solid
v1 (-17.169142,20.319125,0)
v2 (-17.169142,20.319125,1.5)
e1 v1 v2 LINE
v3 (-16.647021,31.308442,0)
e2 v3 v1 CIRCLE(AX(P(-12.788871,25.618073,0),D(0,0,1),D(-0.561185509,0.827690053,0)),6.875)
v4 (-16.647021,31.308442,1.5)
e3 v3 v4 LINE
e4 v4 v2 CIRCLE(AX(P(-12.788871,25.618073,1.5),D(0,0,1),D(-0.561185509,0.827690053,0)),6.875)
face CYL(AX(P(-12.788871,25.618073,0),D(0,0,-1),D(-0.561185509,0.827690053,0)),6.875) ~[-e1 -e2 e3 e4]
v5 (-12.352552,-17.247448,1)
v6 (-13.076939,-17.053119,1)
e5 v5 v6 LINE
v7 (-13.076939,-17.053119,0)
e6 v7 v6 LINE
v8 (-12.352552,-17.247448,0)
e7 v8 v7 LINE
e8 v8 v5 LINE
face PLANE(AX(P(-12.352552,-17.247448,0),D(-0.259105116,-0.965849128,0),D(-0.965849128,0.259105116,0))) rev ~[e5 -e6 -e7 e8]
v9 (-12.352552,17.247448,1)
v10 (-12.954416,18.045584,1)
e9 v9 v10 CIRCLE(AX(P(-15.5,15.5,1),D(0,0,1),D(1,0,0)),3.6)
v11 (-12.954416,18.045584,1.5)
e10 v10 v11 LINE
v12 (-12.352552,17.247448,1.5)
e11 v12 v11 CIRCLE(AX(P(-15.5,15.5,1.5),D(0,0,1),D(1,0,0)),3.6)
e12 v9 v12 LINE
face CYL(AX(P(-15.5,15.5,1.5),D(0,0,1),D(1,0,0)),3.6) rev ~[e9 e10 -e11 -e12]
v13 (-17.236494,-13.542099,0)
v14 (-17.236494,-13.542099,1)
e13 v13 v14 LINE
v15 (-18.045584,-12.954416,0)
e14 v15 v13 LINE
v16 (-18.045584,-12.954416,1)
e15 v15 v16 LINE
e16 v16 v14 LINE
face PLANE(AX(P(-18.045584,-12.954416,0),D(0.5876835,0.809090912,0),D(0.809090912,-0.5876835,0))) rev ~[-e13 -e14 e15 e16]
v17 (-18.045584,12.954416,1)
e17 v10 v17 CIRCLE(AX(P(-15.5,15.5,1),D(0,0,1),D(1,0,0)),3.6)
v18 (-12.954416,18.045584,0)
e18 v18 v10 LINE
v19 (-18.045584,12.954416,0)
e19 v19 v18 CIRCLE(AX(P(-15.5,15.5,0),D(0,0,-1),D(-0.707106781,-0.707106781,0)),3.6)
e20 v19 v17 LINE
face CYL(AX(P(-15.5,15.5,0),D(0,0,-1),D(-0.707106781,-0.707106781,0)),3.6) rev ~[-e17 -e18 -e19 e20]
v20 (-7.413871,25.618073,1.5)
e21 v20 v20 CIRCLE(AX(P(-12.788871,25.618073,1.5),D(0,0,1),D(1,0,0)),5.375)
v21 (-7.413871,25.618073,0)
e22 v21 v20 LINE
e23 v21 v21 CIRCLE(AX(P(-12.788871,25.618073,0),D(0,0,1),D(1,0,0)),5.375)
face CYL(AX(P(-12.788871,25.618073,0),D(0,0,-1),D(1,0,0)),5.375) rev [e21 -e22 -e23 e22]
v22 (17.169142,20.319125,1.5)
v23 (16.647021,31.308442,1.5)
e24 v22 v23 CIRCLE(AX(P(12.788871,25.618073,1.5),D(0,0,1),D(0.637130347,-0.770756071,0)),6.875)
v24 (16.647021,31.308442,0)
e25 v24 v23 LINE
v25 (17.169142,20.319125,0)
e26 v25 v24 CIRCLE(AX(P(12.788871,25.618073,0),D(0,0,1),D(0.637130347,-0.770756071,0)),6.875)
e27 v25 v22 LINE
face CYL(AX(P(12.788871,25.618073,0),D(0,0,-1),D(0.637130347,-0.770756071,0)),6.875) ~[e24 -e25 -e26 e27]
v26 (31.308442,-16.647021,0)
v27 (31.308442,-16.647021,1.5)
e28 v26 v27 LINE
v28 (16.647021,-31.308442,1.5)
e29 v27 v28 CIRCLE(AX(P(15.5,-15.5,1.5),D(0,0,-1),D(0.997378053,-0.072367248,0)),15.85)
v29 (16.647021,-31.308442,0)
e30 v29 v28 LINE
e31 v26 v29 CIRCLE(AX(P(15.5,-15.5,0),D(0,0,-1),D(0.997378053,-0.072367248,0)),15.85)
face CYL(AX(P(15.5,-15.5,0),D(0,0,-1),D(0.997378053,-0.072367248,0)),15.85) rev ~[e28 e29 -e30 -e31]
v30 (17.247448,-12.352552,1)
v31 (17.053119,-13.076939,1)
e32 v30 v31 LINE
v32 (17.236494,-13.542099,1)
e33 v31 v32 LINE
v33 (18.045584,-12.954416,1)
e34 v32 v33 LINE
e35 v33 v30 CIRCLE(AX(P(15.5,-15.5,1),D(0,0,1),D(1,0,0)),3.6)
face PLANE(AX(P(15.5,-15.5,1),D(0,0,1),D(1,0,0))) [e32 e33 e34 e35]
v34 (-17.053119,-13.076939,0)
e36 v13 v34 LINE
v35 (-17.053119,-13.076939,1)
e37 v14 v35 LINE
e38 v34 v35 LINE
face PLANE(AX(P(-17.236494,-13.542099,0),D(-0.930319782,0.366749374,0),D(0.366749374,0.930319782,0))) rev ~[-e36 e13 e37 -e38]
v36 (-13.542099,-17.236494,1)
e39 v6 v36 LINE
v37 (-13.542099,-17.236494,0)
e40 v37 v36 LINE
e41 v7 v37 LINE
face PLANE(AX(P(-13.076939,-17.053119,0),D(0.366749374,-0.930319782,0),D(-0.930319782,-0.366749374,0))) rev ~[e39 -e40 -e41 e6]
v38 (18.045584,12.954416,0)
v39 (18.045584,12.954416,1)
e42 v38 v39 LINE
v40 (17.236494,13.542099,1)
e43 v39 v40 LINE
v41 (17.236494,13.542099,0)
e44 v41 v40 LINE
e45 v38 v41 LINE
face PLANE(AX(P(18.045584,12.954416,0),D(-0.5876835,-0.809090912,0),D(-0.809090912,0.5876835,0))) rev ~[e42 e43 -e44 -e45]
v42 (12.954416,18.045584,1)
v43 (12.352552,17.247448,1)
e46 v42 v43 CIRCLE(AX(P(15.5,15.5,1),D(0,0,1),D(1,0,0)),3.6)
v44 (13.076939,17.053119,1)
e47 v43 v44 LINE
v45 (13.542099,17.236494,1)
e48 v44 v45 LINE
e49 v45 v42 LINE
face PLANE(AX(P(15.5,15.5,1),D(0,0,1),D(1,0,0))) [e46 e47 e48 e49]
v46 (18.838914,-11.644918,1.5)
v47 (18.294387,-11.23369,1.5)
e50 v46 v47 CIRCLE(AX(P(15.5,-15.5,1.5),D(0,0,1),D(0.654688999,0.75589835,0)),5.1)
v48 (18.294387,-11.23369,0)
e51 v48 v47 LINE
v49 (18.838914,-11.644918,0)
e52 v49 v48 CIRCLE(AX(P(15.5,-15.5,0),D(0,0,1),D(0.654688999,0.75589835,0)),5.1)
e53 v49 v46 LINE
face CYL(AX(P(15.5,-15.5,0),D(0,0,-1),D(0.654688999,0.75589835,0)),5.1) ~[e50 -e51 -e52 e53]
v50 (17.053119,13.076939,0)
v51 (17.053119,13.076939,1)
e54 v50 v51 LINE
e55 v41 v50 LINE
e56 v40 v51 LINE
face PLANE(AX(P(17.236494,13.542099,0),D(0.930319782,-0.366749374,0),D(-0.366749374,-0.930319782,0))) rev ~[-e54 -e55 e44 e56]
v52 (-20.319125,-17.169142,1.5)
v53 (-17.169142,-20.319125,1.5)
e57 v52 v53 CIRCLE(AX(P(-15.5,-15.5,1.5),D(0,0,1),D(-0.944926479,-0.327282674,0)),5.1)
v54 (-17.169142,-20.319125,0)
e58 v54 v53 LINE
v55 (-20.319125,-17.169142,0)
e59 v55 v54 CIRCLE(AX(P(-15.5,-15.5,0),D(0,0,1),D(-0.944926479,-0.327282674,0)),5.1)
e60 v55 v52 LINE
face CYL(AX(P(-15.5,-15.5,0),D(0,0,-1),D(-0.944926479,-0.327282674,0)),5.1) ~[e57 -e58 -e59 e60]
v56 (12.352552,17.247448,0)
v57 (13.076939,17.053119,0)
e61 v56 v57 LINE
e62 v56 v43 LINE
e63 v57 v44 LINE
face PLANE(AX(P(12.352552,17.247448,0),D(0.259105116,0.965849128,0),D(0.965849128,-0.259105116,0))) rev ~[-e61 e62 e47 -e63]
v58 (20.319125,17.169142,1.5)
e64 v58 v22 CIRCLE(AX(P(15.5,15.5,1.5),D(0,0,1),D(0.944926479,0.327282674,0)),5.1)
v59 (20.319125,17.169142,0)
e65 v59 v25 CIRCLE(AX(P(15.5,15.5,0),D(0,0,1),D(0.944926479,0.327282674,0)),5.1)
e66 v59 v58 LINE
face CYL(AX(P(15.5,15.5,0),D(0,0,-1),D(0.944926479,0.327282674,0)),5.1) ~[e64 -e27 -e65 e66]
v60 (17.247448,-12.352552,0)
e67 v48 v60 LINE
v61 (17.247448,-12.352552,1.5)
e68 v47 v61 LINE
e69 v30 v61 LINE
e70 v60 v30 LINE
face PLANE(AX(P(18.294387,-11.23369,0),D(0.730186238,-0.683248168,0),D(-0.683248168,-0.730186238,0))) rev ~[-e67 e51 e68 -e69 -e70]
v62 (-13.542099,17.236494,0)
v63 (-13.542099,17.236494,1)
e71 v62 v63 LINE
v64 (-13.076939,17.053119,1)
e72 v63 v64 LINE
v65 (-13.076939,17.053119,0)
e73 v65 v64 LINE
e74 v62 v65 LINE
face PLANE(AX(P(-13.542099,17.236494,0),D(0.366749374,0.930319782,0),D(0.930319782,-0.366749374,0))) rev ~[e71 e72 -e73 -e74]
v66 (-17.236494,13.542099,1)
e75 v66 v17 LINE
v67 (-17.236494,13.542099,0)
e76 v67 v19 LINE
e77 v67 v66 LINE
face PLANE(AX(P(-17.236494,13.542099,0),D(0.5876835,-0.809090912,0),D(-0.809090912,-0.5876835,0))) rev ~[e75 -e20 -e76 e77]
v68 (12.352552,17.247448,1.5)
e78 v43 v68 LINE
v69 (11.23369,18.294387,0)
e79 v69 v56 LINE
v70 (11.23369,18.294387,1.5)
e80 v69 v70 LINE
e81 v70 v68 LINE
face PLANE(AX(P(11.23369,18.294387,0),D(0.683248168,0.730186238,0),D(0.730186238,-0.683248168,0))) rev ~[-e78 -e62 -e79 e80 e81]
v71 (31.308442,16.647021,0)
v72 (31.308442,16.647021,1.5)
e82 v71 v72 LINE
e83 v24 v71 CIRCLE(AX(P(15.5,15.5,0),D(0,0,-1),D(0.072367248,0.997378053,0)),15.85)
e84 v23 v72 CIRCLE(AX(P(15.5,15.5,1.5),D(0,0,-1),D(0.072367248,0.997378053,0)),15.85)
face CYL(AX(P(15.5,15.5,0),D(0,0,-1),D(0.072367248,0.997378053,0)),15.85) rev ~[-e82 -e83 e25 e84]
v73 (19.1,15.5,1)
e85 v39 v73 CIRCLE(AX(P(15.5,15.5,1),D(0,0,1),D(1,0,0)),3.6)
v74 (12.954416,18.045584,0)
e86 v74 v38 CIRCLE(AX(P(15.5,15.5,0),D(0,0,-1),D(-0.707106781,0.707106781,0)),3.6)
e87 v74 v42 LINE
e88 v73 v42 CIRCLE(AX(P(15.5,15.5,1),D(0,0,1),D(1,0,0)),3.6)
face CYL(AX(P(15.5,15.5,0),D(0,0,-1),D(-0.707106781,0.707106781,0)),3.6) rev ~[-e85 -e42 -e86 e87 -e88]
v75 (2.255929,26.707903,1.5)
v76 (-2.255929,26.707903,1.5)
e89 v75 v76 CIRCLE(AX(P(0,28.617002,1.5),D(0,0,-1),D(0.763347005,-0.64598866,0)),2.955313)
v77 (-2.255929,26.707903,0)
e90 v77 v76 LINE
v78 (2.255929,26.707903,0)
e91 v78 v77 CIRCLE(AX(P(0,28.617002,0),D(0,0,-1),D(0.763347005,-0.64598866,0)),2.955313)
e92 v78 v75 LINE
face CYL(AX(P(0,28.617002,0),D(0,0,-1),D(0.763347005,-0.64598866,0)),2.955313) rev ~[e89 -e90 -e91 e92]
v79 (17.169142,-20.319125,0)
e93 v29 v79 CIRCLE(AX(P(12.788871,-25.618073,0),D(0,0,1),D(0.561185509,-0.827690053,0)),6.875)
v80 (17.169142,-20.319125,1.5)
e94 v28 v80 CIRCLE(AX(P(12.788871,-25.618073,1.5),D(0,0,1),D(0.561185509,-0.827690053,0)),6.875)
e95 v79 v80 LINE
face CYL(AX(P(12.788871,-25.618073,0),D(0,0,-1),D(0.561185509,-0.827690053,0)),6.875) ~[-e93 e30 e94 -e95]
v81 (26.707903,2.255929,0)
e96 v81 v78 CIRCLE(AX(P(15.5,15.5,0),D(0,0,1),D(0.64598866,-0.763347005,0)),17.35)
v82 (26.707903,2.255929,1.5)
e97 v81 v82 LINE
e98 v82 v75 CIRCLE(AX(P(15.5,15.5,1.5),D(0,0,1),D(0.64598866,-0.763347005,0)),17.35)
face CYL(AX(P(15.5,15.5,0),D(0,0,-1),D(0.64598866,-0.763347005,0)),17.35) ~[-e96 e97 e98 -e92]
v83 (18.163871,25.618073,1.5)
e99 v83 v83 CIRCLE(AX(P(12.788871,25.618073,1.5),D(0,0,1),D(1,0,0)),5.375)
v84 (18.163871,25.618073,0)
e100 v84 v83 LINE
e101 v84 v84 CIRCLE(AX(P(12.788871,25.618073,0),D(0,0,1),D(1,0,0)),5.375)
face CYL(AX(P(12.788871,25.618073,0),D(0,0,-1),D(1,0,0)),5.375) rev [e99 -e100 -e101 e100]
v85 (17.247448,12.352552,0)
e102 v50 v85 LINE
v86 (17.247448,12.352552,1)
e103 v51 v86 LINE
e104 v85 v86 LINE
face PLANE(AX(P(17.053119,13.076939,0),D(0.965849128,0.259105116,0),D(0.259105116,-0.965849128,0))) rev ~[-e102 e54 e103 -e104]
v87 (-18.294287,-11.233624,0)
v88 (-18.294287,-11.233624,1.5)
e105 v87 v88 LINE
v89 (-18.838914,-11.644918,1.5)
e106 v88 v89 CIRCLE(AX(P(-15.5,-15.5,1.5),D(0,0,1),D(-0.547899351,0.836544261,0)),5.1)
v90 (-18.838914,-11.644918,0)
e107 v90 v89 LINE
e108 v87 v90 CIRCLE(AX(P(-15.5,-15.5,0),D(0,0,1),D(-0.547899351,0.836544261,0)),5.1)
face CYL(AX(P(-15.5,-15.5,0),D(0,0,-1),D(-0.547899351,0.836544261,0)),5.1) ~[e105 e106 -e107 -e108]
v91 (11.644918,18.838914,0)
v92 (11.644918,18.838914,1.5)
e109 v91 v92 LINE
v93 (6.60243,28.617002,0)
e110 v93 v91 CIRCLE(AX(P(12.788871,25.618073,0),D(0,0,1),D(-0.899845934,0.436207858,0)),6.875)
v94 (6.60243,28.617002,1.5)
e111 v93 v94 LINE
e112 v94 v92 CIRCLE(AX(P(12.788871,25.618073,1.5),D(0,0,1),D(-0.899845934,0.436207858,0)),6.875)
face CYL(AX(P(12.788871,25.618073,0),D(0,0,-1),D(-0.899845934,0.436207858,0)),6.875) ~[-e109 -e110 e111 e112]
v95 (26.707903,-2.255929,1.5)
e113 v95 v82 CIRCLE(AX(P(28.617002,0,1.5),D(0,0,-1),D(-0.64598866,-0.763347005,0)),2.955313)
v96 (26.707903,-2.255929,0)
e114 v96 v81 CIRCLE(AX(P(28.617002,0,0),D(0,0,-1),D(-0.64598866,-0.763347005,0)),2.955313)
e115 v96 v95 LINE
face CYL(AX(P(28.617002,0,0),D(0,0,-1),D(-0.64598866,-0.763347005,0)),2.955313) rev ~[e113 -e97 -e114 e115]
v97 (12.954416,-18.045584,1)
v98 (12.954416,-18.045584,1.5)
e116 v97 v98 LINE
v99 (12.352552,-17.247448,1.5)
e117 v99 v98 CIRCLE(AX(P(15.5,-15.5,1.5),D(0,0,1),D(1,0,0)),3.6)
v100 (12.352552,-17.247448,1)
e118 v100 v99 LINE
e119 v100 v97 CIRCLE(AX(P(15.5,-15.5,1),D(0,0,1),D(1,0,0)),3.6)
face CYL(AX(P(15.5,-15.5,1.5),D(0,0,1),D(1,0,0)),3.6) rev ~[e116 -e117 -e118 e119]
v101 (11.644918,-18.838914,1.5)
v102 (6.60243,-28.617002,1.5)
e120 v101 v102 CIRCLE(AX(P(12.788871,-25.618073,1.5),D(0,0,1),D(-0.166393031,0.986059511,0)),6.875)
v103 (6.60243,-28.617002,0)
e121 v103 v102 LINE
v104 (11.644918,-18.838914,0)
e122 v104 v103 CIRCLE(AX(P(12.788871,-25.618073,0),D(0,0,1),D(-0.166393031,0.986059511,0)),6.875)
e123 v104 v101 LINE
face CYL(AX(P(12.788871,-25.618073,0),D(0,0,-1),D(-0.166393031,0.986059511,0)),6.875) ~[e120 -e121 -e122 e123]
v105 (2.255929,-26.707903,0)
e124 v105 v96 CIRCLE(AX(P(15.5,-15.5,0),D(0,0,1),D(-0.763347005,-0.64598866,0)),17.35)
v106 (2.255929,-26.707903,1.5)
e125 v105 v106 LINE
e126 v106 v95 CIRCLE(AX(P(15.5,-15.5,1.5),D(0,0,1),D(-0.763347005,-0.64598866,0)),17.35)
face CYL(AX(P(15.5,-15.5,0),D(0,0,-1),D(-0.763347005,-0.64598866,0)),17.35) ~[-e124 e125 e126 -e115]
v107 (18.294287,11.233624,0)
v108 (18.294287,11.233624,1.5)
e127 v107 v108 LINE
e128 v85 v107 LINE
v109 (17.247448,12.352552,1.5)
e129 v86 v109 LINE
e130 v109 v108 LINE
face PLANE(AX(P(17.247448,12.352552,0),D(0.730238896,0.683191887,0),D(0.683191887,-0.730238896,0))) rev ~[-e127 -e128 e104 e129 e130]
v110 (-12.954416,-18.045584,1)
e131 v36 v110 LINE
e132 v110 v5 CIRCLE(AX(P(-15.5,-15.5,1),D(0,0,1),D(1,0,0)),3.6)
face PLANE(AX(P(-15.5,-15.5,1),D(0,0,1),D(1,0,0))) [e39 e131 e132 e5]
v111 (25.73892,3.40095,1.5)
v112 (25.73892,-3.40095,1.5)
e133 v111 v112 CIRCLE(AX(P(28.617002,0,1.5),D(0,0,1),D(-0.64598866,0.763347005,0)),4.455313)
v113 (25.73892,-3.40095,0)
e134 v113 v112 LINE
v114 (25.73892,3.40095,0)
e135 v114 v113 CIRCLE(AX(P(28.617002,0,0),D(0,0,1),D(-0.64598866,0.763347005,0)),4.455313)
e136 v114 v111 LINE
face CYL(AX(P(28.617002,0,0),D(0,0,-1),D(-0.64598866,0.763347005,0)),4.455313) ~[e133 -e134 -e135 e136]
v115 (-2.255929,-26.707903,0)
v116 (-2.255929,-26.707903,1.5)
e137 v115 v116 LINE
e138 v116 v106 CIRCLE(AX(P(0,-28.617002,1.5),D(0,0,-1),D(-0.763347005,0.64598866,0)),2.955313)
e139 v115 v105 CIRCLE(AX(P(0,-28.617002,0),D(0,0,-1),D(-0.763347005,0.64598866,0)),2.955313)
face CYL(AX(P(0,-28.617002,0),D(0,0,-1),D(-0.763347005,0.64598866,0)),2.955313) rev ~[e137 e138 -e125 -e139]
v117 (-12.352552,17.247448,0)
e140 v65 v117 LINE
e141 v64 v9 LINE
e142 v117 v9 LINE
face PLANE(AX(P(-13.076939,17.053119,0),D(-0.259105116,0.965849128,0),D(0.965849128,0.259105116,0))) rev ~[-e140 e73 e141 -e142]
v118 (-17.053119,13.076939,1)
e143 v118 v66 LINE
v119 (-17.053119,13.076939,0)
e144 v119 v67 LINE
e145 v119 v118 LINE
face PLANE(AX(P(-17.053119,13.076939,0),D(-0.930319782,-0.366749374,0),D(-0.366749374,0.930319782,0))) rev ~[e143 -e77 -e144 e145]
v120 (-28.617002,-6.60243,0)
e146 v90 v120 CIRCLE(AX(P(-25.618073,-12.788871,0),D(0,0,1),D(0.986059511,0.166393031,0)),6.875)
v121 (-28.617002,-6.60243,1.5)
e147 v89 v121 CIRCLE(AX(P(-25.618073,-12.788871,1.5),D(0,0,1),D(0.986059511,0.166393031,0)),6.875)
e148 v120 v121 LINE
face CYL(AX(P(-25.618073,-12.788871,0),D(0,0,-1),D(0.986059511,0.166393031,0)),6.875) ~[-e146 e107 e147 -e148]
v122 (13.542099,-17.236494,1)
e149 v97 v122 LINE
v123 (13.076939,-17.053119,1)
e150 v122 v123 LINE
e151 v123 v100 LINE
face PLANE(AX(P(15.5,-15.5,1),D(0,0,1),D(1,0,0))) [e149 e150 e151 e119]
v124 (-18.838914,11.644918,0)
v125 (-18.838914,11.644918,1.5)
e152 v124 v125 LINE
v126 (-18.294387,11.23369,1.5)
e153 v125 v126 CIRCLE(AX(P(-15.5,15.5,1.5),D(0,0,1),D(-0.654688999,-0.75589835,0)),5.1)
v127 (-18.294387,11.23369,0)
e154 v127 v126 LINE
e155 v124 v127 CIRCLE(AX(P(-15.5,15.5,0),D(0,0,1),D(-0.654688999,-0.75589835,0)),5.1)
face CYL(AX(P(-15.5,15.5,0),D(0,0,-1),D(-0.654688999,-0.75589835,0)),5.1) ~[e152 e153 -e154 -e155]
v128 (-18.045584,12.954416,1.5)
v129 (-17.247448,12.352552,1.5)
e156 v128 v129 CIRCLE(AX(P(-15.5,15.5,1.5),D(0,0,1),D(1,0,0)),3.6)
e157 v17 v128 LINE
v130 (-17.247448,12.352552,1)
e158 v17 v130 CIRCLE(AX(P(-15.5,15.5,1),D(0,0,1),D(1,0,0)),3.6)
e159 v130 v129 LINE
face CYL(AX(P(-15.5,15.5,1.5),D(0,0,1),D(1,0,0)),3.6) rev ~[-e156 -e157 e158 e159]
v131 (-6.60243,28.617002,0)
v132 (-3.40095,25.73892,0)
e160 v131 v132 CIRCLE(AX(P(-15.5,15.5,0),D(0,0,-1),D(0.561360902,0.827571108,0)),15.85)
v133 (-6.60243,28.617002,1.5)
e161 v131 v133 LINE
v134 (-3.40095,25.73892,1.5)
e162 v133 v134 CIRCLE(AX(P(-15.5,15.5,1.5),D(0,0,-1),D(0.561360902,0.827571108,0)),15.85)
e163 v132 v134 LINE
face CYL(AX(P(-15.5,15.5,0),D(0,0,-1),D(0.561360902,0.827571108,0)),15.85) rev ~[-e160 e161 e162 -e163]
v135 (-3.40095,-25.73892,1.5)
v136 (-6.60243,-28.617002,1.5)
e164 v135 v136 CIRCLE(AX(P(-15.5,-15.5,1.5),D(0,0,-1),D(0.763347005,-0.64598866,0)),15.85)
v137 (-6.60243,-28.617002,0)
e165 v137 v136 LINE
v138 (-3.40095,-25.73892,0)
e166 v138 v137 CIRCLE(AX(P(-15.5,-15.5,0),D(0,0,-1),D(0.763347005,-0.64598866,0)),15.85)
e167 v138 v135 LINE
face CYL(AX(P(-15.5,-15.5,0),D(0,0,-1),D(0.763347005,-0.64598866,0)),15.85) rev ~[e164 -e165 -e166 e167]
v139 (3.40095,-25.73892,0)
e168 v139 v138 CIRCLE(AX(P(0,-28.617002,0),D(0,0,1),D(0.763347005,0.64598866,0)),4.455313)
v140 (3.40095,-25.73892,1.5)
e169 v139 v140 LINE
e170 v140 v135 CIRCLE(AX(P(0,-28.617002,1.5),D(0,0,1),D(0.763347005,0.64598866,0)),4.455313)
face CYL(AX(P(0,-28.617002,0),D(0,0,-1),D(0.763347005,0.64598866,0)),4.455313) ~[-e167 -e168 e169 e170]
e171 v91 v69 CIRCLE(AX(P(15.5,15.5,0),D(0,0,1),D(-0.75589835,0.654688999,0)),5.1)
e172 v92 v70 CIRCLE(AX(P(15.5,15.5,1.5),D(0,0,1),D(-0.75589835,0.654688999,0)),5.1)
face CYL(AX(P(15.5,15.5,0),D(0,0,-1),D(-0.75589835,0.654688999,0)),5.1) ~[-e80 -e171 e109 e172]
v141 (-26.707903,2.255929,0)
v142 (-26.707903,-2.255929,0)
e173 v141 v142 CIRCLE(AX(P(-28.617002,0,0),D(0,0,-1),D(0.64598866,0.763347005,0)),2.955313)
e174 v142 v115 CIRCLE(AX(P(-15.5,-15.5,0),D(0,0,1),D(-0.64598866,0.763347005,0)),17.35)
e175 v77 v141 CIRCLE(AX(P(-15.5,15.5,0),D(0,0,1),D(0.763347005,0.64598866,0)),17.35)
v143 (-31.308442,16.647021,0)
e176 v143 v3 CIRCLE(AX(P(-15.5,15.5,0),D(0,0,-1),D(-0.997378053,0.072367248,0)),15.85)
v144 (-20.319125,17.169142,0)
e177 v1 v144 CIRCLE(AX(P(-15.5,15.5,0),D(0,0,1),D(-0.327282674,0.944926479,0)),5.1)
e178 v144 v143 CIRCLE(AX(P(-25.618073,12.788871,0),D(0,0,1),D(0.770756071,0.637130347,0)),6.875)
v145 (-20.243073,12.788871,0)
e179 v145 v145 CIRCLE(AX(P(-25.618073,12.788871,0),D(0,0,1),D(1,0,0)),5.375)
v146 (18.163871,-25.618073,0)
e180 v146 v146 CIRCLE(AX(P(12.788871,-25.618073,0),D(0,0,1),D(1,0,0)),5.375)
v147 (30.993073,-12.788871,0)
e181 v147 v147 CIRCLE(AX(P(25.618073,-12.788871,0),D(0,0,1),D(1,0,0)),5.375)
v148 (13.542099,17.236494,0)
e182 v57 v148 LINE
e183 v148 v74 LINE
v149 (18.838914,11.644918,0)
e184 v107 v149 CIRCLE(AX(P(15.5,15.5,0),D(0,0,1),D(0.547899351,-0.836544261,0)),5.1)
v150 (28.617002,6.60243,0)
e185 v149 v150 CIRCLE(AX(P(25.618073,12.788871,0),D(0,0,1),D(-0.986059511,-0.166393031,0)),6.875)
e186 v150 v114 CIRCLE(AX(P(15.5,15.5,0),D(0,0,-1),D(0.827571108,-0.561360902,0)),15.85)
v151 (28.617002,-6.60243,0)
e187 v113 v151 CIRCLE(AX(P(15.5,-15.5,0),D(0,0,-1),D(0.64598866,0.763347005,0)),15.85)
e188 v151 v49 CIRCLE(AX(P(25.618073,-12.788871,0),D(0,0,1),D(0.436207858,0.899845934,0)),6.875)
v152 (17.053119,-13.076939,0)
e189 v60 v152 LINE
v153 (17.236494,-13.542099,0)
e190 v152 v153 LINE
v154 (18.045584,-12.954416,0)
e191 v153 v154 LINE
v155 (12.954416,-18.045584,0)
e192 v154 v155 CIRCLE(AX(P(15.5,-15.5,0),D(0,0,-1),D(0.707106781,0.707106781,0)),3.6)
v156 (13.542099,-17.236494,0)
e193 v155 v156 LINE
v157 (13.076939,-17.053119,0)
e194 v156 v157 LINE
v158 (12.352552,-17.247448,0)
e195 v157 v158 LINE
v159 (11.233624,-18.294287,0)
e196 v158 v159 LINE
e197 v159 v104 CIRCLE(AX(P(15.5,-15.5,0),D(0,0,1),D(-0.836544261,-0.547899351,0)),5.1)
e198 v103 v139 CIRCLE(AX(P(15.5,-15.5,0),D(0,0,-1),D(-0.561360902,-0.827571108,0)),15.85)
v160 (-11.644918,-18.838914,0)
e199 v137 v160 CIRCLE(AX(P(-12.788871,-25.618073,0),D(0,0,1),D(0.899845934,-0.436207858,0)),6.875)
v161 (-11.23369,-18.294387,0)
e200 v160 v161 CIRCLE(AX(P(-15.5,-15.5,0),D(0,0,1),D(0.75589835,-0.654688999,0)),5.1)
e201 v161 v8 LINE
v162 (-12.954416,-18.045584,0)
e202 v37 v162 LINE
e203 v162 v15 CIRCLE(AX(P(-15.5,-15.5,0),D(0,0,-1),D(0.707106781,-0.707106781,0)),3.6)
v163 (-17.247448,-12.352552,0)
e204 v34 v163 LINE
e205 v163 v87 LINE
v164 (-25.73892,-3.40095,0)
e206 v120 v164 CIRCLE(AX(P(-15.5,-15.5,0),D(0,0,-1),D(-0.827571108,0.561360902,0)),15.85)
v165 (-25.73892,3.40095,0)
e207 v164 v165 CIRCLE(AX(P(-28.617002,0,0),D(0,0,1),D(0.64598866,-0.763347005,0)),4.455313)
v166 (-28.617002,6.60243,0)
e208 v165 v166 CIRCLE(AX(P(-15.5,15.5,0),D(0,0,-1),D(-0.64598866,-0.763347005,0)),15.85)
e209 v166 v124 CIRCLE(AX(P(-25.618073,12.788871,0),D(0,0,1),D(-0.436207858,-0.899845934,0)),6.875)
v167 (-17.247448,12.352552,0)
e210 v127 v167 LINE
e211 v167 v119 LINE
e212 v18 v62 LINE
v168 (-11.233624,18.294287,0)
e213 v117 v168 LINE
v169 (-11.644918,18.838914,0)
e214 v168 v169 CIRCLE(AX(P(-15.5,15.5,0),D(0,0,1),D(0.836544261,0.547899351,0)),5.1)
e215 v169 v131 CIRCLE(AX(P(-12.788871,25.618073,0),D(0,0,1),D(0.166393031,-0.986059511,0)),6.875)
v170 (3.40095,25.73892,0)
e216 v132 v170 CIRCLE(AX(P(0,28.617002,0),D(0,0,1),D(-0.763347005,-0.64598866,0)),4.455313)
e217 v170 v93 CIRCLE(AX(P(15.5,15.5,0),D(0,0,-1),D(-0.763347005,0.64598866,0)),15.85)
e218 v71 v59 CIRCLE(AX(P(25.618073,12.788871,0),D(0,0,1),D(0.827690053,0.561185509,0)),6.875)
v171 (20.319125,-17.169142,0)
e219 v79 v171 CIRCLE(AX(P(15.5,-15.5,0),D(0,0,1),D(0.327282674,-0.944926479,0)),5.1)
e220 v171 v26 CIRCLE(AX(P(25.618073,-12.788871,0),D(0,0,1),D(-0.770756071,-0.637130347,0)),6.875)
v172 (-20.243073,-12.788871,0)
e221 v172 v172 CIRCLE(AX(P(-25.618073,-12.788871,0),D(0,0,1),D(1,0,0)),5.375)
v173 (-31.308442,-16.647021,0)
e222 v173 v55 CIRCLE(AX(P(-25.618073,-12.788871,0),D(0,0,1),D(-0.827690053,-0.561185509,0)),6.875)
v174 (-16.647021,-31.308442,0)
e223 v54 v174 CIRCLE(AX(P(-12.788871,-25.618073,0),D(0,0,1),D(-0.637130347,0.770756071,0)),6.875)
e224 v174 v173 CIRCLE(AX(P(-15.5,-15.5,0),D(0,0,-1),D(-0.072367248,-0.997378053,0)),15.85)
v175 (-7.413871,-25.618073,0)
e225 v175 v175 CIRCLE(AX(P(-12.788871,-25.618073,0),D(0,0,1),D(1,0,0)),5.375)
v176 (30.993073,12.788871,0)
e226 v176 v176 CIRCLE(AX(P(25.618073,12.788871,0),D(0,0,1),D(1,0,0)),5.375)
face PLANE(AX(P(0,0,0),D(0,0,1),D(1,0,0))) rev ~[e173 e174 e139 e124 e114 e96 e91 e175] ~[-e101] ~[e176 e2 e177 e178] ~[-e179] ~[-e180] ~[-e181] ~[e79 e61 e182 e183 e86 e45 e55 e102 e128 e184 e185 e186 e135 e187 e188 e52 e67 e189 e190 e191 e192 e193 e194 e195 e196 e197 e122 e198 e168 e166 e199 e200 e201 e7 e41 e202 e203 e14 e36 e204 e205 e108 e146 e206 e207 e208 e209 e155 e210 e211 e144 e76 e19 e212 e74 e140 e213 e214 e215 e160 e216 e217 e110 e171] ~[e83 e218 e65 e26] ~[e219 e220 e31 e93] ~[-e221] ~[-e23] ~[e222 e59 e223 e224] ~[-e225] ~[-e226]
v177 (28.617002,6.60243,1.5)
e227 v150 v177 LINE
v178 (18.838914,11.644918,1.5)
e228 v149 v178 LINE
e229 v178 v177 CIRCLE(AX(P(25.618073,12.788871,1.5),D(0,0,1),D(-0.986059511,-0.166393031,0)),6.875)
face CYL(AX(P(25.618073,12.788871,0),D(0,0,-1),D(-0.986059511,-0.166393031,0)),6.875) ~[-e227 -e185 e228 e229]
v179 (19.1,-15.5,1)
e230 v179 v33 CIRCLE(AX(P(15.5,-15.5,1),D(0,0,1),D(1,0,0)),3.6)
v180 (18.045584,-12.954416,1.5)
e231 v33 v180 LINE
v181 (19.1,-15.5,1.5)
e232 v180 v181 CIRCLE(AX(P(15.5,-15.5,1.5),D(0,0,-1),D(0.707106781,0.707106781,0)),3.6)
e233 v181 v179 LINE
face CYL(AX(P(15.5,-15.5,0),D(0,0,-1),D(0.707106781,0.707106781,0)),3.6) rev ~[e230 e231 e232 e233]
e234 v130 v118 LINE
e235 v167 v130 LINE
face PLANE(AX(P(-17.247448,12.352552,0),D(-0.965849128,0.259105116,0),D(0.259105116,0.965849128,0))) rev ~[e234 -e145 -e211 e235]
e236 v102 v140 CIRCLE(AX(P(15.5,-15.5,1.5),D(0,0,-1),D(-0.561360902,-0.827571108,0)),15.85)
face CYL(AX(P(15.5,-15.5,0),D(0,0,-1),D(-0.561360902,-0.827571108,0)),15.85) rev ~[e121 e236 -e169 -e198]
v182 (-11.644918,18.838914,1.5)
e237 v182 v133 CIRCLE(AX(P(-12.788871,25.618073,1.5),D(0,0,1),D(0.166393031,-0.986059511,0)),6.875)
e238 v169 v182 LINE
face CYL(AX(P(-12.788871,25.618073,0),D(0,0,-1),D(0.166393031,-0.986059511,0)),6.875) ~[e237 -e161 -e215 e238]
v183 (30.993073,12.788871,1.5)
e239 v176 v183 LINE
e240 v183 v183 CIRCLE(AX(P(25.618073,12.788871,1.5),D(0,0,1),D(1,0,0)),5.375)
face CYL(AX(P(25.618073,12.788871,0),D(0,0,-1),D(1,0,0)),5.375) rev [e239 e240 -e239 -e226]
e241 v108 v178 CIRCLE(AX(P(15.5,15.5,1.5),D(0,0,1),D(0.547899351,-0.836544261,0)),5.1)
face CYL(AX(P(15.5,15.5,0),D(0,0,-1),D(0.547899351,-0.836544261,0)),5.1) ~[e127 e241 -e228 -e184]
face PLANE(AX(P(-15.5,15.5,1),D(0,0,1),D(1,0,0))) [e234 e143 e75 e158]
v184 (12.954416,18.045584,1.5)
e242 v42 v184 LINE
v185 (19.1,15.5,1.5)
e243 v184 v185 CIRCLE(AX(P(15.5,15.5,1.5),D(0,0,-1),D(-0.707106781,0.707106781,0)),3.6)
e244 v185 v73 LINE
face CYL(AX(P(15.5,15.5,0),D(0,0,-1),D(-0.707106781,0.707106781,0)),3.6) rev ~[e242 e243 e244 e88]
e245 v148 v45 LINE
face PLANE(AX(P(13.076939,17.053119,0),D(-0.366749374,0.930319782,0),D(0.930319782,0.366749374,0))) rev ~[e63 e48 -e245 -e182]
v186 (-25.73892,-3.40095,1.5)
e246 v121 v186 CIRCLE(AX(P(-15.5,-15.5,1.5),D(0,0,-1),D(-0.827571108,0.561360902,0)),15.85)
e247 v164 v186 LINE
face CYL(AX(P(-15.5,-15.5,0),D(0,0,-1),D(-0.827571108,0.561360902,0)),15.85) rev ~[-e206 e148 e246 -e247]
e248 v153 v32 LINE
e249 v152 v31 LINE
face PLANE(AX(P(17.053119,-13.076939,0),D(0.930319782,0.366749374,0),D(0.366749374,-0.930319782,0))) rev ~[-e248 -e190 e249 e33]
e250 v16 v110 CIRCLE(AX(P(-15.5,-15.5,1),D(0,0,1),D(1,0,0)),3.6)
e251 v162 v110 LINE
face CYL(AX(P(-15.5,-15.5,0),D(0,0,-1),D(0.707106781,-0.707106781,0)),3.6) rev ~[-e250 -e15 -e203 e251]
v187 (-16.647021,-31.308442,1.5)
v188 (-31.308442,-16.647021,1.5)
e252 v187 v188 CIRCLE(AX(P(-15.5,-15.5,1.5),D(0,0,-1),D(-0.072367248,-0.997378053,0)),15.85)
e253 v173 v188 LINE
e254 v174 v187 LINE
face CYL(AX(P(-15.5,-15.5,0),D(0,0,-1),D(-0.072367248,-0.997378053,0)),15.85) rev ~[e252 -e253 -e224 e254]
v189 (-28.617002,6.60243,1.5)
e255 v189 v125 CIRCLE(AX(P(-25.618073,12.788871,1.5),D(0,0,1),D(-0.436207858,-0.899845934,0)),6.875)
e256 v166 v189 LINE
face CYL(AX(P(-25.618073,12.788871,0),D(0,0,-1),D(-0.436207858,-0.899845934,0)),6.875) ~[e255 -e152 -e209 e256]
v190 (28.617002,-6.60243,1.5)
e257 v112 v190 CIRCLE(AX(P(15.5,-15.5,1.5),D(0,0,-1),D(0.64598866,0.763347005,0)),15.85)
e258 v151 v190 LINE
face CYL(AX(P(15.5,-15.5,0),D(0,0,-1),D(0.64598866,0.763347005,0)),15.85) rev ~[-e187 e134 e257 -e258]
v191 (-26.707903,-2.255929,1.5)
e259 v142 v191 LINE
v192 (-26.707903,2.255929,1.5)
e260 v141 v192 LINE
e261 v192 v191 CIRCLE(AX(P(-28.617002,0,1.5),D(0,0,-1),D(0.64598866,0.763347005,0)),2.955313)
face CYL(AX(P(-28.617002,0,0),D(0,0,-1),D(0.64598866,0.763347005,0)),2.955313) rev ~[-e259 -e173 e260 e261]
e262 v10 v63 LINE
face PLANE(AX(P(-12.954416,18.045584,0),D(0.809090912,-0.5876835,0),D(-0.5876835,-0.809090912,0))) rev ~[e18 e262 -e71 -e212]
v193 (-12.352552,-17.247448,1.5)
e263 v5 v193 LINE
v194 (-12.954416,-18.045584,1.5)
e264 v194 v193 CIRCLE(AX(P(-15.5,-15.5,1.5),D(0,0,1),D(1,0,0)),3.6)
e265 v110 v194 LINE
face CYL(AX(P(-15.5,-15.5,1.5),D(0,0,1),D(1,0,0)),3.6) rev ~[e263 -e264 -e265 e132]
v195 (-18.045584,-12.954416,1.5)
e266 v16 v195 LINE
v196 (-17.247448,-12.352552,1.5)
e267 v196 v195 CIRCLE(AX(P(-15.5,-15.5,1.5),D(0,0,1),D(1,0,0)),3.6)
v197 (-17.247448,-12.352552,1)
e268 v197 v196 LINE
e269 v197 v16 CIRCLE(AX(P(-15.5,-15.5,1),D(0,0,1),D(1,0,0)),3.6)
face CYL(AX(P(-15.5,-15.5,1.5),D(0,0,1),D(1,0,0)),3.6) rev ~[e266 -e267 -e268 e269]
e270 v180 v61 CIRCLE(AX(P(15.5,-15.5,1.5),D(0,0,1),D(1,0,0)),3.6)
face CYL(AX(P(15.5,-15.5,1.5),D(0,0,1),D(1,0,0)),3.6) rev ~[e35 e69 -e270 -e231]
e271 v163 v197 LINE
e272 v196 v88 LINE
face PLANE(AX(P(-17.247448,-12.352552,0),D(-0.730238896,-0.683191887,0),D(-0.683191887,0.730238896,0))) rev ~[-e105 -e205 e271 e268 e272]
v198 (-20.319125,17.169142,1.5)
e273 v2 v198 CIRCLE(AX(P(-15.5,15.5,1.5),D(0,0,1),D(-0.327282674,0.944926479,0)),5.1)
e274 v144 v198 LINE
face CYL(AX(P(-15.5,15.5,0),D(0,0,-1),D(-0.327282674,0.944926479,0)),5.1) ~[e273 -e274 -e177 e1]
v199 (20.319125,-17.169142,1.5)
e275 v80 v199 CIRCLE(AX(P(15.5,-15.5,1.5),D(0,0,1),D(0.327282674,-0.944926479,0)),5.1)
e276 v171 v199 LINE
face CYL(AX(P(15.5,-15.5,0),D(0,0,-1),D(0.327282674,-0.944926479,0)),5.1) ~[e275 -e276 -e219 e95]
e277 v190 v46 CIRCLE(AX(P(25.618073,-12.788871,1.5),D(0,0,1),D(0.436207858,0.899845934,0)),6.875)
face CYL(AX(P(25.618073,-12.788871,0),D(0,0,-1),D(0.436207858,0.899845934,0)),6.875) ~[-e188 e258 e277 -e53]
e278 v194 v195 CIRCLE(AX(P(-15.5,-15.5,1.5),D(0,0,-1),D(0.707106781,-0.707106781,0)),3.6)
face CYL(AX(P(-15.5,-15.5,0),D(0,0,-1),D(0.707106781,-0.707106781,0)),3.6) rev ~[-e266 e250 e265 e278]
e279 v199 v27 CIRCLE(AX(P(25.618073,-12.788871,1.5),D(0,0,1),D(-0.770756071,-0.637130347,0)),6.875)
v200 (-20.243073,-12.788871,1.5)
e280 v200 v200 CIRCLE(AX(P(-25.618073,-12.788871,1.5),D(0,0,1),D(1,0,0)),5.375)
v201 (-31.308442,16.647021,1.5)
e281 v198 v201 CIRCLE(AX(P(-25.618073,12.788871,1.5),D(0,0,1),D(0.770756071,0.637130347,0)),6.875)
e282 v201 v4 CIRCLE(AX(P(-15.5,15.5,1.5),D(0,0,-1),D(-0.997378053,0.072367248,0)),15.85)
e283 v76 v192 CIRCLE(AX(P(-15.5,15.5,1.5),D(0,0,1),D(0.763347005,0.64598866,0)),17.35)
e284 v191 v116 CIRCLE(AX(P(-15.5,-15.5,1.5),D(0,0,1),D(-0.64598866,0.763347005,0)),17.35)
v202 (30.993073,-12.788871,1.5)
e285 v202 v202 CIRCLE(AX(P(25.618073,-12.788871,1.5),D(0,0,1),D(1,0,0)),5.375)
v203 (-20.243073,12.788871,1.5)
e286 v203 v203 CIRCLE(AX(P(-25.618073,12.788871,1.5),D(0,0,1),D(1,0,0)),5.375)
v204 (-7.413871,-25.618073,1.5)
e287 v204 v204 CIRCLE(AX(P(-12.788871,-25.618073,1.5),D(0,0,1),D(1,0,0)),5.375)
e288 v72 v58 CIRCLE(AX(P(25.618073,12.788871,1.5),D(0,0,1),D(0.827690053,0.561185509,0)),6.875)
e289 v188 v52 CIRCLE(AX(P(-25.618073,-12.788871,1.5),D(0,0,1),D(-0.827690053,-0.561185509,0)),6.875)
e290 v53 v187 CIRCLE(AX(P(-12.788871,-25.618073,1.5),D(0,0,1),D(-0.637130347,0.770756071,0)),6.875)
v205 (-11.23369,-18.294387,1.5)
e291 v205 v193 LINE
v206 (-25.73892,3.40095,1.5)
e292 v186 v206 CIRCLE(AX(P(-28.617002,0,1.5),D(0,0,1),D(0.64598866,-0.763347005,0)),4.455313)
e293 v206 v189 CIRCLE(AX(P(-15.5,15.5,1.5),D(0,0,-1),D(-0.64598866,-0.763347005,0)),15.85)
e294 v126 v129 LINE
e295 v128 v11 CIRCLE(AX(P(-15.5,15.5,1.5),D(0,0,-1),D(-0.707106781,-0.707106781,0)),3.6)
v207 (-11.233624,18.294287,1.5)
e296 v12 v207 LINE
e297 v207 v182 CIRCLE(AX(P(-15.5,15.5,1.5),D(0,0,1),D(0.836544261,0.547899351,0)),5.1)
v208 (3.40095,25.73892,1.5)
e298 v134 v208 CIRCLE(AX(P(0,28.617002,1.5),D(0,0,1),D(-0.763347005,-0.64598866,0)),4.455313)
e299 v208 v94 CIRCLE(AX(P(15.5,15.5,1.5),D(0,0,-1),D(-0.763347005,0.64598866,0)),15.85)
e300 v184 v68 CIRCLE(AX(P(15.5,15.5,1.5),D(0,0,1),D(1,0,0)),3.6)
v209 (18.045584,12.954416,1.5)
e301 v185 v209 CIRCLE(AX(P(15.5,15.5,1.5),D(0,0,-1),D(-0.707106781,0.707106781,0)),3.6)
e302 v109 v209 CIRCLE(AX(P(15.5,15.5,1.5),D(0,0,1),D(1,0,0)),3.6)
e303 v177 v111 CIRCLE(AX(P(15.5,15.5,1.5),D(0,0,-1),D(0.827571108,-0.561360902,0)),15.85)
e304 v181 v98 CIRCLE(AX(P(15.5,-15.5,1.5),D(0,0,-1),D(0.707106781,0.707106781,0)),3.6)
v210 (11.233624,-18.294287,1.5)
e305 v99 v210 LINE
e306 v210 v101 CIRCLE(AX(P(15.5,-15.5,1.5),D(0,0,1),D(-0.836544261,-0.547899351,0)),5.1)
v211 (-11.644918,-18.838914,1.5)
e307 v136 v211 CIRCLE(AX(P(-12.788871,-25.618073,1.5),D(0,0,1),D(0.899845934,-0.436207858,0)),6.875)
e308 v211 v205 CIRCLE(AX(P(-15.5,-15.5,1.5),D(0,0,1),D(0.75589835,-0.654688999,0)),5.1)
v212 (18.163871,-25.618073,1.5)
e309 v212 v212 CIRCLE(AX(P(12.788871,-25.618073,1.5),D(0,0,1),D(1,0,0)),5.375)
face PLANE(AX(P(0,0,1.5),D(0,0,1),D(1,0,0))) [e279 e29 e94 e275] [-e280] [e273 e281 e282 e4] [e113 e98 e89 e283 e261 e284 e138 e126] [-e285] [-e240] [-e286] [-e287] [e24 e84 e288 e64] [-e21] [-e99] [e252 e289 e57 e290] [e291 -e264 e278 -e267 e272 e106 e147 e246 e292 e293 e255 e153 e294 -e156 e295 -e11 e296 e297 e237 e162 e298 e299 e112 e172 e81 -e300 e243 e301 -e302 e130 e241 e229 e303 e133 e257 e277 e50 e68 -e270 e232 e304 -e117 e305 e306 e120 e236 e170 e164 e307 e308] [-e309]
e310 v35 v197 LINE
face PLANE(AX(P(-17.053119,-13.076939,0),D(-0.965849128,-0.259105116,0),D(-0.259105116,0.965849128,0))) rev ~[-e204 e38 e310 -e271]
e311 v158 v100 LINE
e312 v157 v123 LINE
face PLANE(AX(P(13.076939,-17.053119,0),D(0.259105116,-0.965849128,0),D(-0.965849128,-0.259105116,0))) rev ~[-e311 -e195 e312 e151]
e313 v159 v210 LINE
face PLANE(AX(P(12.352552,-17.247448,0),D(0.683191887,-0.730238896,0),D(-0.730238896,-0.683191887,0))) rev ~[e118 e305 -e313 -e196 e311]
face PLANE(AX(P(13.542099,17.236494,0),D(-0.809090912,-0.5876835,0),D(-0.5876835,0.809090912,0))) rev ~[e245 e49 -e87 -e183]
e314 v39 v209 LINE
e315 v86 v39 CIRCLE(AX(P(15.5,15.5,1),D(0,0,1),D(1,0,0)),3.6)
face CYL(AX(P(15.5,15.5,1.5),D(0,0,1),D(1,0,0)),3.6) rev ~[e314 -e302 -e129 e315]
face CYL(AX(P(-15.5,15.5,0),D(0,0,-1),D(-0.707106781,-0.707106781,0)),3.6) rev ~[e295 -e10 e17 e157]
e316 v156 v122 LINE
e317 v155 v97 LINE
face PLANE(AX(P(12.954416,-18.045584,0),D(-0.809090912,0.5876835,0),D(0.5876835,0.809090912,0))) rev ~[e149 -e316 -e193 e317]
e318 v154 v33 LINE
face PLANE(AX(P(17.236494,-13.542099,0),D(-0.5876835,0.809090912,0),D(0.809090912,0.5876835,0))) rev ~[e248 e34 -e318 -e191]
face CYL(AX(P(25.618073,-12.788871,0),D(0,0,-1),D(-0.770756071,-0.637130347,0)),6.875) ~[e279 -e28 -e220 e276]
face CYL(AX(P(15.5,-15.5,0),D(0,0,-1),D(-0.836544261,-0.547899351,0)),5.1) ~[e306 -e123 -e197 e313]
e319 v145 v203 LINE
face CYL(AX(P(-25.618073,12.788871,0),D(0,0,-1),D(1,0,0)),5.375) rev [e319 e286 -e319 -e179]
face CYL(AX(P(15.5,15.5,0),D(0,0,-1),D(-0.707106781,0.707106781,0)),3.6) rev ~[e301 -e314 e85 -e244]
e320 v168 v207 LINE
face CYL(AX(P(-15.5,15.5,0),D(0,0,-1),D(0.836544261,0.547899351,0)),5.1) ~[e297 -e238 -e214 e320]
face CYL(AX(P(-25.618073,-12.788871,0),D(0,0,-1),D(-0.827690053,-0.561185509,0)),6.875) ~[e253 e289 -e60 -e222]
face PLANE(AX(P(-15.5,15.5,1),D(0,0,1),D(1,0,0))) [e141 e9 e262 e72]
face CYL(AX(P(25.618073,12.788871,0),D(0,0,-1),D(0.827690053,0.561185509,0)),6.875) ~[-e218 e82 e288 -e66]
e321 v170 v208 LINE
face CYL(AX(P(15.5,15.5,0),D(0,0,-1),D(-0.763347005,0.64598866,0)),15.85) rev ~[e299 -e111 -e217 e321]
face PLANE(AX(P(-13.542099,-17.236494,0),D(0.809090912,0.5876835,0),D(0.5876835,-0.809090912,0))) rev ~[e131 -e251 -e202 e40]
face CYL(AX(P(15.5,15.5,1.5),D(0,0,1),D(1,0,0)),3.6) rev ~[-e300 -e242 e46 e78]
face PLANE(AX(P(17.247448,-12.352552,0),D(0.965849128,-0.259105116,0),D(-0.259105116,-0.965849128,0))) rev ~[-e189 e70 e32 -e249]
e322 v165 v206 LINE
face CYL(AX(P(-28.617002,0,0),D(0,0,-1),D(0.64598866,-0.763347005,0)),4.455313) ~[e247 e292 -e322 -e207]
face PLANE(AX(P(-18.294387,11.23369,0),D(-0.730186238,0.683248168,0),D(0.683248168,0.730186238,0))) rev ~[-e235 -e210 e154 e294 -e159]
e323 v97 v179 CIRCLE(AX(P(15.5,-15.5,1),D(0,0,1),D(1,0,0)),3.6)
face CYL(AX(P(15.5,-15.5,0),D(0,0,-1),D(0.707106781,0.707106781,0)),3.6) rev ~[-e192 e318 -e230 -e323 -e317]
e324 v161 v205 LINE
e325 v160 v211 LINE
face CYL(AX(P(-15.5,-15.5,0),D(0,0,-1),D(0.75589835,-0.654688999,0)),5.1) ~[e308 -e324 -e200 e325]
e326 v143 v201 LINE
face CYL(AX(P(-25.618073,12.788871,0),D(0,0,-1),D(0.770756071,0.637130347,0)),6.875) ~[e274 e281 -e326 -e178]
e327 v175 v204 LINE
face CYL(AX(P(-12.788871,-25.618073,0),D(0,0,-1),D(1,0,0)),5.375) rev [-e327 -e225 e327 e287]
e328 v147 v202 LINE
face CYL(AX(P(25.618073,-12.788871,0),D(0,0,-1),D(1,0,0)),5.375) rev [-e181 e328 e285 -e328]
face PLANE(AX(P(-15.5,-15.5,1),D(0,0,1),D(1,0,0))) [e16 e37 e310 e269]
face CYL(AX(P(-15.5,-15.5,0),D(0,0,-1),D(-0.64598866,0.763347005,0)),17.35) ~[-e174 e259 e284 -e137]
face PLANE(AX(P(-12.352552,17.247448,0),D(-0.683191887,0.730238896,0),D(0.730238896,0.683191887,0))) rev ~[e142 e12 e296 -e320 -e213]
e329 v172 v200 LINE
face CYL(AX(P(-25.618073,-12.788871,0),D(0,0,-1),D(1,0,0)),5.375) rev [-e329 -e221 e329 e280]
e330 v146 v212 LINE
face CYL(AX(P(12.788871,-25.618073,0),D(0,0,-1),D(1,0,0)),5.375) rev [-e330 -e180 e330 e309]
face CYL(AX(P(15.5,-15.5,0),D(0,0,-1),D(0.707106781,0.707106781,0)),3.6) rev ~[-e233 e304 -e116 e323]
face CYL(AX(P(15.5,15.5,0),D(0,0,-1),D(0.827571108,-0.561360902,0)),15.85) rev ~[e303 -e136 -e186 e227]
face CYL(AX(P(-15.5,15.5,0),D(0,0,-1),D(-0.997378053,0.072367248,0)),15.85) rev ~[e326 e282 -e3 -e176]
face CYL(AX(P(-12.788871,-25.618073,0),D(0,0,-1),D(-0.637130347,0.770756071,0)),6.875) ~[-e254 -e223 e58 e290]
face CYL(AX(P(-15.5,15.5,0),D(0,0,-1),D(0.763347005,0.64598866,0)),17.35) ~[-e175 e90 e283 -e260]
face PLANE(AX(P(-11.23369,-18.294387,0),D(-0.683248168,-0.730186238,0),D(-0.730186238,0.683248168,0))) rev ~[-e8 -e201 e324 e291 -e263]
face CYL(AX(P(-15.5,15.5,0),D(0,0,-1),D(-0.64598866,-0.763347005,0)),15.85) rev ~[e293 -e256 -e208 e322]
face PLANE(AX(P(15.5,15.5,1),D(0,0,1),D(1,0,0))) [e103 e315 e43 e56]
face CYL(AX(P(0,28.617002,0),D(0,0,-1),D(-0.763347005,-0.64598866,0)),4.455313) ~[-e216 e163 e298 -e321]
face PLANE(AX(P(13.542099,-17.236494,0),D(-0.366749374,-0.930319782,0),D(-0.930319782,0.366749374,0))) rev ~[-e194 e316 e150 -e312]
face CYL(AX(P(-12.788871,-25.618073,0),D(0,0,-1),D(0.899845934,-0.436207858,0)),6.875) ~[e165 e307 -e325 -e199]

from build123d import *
from build123d import SkipClean  # not in build123d's __all__

# Parameters (mm, degrees)
F1_R     = 5.375
F2_DEPTH = 1.5
F3_R     = 3.6
F4_DEPTH = 0.5


with BuildPart() as f2:
    # F1 (on face) → F2 (new body)
    with BuildSketch(Plane.XY):
        with BuildLine():
            ThreePointArc((2.2559294574, 26.707903259), (0, 25.6616888853), (-2.2559294574, 26.707903259))
            ThreePointArc((-2.2559294574, 26.707903259), (-27.7683026536, 27.7683026536), (-26.707903259, 2.2559294574))
            ThreePointArc((-26.707903259, 2.2559294574), (-25.6616888853, 0), (-26.707903259, -2.2559294574))
            ThreePointArc((-26.707903259, -2.2559294574), (-27.7683026536, -27.7683026536), (-2.2559294574, -26.707903259))
            ThreePointArc((-2.2559294574, -26.707903259), (0, -25.6616888853), (2.2559294574, -26.707903259))
            ThreePointArc((2.2559294574, -26.707903259), (27.7683026536, -27.7683026536), (26.707903259, -2.2559294574))
            ThreePointArc((26.707903259, -2.2559294574), (25.6616888853, 0), (26.707903259, 2.2559294574))
            ThreePointArc((26.707903259, 2.2559294574), (27.7683026536, 27.7683026536), (2.2559294574, 26.707903259))
        make_face()
        with BuildLine():
            ThreePointArc((-20.3191250437, -17.1691416396), (-19.1062445841, -19.1062445841), (-17.1691416396, -20.3191250437))
            ThreePointArc((-17.1691416396, -20.3191250437), (-19.6561239457, -25.9443476809), (-16.6470208781, -31.3084421467))
            ThreePointArc((-16.6470208781, -31.3084421467), (-26.7076424818, -26.7076424818), (-31.3084421467, -16.6470208781))
            ThreePointArc((-31.3084421467, -16.6470208781), (-25.9443476809, -19.6561239457), (-20.3191250437, -17.1691416396))
        make_face(mode=Mode.SUBTRACT)
        with Locations((-12.7888705026, -25.6180730304)):
            Circle(F1_R, mode=Mode.SUBTRACT)
        with Locations((-25.6180730304, -12.7888705026)):
            Circle(F1_R, mode=Mode.SUBTRACT)
        with Locations((12.7888705026, -25.6180730304)):
            Circle(F1_R, mode=Mode.SUBTRACT)
        with BuildLine():
            ThreePointArc((17.1691416396, -20.3191250437), (19.1062445841, -19.1062445841), (20.3191250437, -17.1691416396))
            ThreePointArc((20.3191250437, -17.1691416396), (25.9443476809, -19.6561239457), (31.3084421467, -16.6470208781))
            ThreePointArc((31.3084421467, -16.6470208781), (26.7076424818, -26.7076424818), (16.6470208781, -31.3084421467))
            ThreePointArc((16.6470208781, -31.3084421467), (19.6561239457, -25.9443476809), (17.1691416396, -20.3191250437))
        make_face(mode=Mode.SUBTRACT)
        with Locations((25.6180730304, -12.7888705026)):
            Circle(F1_R, mode=Mode.SUBTRACT)
        with Locations((-25.6180730304, 12.7888705026)):
            Circle(F1_R, mode=Mode.SUBTRACT)
        with BuildLine():
            ThreePointArc((-17.1691416396, 20.3191250437), (-19.1062445841, 19.1062445841), (-20.3191250437, 17.1691416396))
            ThreePointArc((-20.3191250437, 17.1691416396), (-25.9443476809, 19.6561239457), (-31.3084421467, 16.6470208781))
            ThreePointArc((-31.3084421467, 16.6470208781), (-26.7076424818, 26.7076424818), (-16.6470208781, 31.3084421467))
            ThreePointArc((-16.6470208781, 31.3084421467), (-19.6561239457, 25.9443476809), (-17.1691416396, 20.3191250437))
        make_face(mode=Mode.SUBTRACT)
        with Locations((-12.7888705026, 25.6180730304)):
            Circle(F1_R, mode=Mode.SUBTRACT)
        with BuildLine():
            Line((-17.2474476501, 12.3525523499), (-17.0531188132, 13.0769391962))
            Line((-17.0531188132, 13.0769391962), (-17.2364935, 13.5420990873))
            Line((-17.2364935, 13.5420990873), (-18.0455844123, 12.9544155877))
            ThreePointArc((-18.0455844123, 12.9544155877), (-18.0455844123, 18.0455844123), (-12.9544155877, 18.0455844123))
            Line((-12.9544155877, 18.0455844123), (-13.5420990873, 17.2364935))
            Line((-13.5420990873, 17.2364935), (-13.0769391962, 17.0531188132))
            Line((-13.0769391962, 17.0531188132), (-12.3525523499, 17.2474476501))
            Line((-12.3525523499, 17.2474476501), (-11.2336242687, 18.2942866924))
            ThreePointArc((-11.2336242687, 18.2942866924), (-11.4301508715, 18.5734879325), (-11.6449184157, 18.838913892))
            ThreePointArc((-11.6449184157, 18.838913892), (-6.6785172413, 22.4670084448), (-6.6024297076, 28.6170020543))
            ThreePointArc((-6.6024297076, 28.6170020543), (-4.9035215764, 27.2871601762), (-3.4009499654, 25.7389202683))
            ThreePointArc((-3.4009499654, 25.7389202683), (0, 24.1616888853), (3.4009499654, 25.7389202683))
            ThreePointArc((3.4009499654, 25.7389202683), (4.9035215764, 27.2871601762), (6.6024297076, 28.6170020543))
            ThreePointArc((6.6024297076, 28.6170020543), (6.6785172413, 22.4670084448), (11.6449184157, 18.838913892))
            ThreePointArc((11.6449184157, 18.838913892), (11.4301869928, 18.573535763), (11.2336899494, 18.2943869725))
            Line((11.2336899494, 18.2943869725), (12.3525523499, 17.2474476501))
            Line((12.3525523499, 17.2474476501), (13.0769391962, 17.0531188132))
            Line((13.0769391962, 17.0531188132), (13.5420990873, 17.2364935))
            Line((13.5420990873, 17.2364935), (12.9544155877, 18.0455844123))
            ThreePointArc((12.9544155877, 18.0455844123), (18.0455844123, 18.0455844123), (18.0455844123, 12.9544155877))
            Line((18.0455844123, 12.9544155877), (17.2364935, 13.5420990873))
            Line((17.2364935, 13.5420990873), (17.0531188132, 13.0769391962))
            Line((17.0531188132, 13.0769391962), (17.2474476501, 12.3525523499))
            Line((17.2474476501, 12.3525523499), (18.2942866924, 11.2336242687))
            ThreePointArc((18.2942866924, 11.2336242687), (18.5734879325, 11.4301508715), (18.838913892, 11.6449184157))
            ThreePointArc((18.838913892, 11.6449184157), (22.4670084448, 6.6785172413), (28.6170020543, 6.6024297076))
            ThreePointArc((28.6170020543, 6.6024297076), (27.2871601762, 4.9035215764), (25.7389202683, 3.4009499654))
            ThreePointArc((25.7389202683, 3.4009499654), (24.1616888853, 0), (25.7389202683, -3.4009499654))
            ThreePointArc((25.7389202683, -3.4009499654), (27.2871601762, -4.9035215764), (28.6170020543, -6.6024297076))
            ThreePointArc((28.6170020543, -6.6024297076), (22.4670084448, -6.6785172413), (18.838913892, -11.6449184157))
            ThreePointArc((18.838913892, -11.6449184157), (18.573535763, -11.4301869928), (18.2943869725, -11.2336899494))
            Line((18.2943869725, -11.2336899494), (17.2474476501, -12.3525523499))
            Line((17.2474476501, -12.3525523499), (17.0531188132, -13.0769391962))
            Line((17.0531188132, -13.0769391962), (17.2364935, -13.5420990873))
            Line((17.2364935, -13.5420990873), (18.0455844123, -12.9544155877))
            ThreePointArc((18.0455844123, -12.9544155877), (18.0455844123, -18.0455844123), (12.9544155877, -18.0455844123))
            Line((12.9544155877, -18.0455844123), (13.5420990873, -17.2364935))
            Line((13.5420990873, -17.2364935), (13.0769391962, -17.0531188132))
            Line((13.0769391962, -17.0531188132), (12.3525523499, -17.2474476501))
            Line((12.3525523499, -17.2474476501), (11.2336242687, -18.2942866924))
            ThreePointArc((11.2336242687, -18.2942866924), (11.4301508715, -18.5734879325), (11.6449184157, -18.838913892))
            ThreePointArc((11.6449184157, -18.838913892), (6.6785172413, -22.4670084448), (6.6024297076, -28.6170020543))
            ThreePointArc((6.6024297076, -28.6170020543), (4.9035215764, -27.2871601762), (3.4009499654, -25.7389202683))
            ThreePointArc((3.4009499654, -25.7389202683), (0, -24.1616888853), (-3.4009499654, -25.7389202683))
            ThreePointArc((-3.4009499654, -25.7389202683), (-4.9035215764, -27.2871601762), (-6.6024297076, -28.6170020543))
            ThreePointArc((-6.6024297076, -28.6170020543), (-6.6785172413, -22.4670084448), (-11.6449184157, -18.838913892))
            ThreePointArc((-11.6449184157, -18.838913892), (-11.4301869928, -18.573535763), (-11.2336899494, -18.2943869725))
            Line((-11.2336899494, -18.2943869725), (-12.3525523499, -17.2474476501))
            Line((-12.3525523499, -17.2474476501), (-13.0769391962, -17.0531188132))
            Line((-13.0769391962, -17.0531188132), (-13.5420990873, -17.2364935))
            Line((-13.5420990873, -17.2364935), (-12.9544155877, -18.0455844123))
            ThreePointArc((-12.9544155877, -18.0455844123), (-18.0455844123, -18.0455844123), (-18.0455844123, -12.9544155877))
            Line((-18.0455844123, -12.9544155877), (-17.2364935, -13.5420990873))
            Line((-17.2364935, -13.5420990873), (-17.0531188132, -13.0769391962))
            Line((-17.0531188132, -13.0769391962), (-17.2474476501, -12.3525523499))
            Line((-17.2474476501, -12.3525523499), (-18.2942866924, -11.2336242687))
            ThreePointArc((-18.2942866924, -11.2336242687), (-18.5734879325, -11.4301508715), (-18.838913892, -11.6449184157))
            ThreePointArc((-18.838913892, -11.6449184157), (-22.4670084448, -6.6785172413), (-28.6170020543, -6.6024297076))
            ThreePointArc((-28.6170020543, -6.6024297076), (-27.2871601762, -4.9035215764), (-25.7389202683, -3.4009499654))
            ThreePointArc((-25.7389202683, -3.4009499654), (-24.1616888853, 0), (-25.7389202683, 3.4009499654))
            ThreePointArc((-25.7389202683, 3.4009499654), (-27.2871601762, 4.9035215764), (-28.6170020543, 6.6024297076))
            ThreePointArc((-28.6170020543, 6.6024297076), (-22.4670084448, 6.6785172413), (-18.838913892, 11.6449184157))
            ThreePointArc((-18.838913892, 11.6449184157), (-18.573535763, 11.4301869928), (-18.2943869725, 11.2336899494))
            Line((-18.2943869725, 11.2336899494), (-17.2474476501, 12.3525523499))
        make_face(mode=Mode.SUBTRACT)
        with Locations((25.6180730304, 12.7888705026)):
            Circle(F1_R, mode=Mode.SUBTRACT)
        with Locations((12.7888705026, 25.6180730304)):
            Circle(F1_R, mode=Mode.SUBTRACT)
        with BuildLine():
            ThreePointArc((20.3191250437, 17.1691416396), (19.1062445841, 19.1062445841), (17.1691416396, 20.3191250437))
            ThreePointArc((17.1691416396, 20.3191250437), (19.6561239457, 25.9443476809), (16.6470208781, 31.3084421467))
            ThreePointArc((16.6470208781, 31.3084421467), (26.7076424818, 26.7076424818), (31.3084421467, 16.6470208781))
            ThreePointArc((31.3084421467, 16.6470208781), (25.9443476809, 19.6561239457), (20.3191250437, 17.1691416396))
        make_face(mode=Mode.SUBTRACT)
    extrude(amount=F2_DEPTH)

    # F3 (on face) → F4 (cut)
    with BuildSketch(Plane.XY.offset(1.5)):
        with Locations((-15.5, 15.5)):
            Circle(F3_R)
        with Locations((-15.5, -15.5)):
            Circle(F3_R)
        with Locations((15.5, -15.5)):
            Circle(F3_R)
        with Locations((15.5, 15.5)):
            Circle(F3_R)
    with SkipClean():  # cleaning this boolean's faces spoils the solid; the shape is the same uncleaned
        extrude(amount=-F4_DEPTH, mode=Mode.SUBTRACT)


solid = f2.part
